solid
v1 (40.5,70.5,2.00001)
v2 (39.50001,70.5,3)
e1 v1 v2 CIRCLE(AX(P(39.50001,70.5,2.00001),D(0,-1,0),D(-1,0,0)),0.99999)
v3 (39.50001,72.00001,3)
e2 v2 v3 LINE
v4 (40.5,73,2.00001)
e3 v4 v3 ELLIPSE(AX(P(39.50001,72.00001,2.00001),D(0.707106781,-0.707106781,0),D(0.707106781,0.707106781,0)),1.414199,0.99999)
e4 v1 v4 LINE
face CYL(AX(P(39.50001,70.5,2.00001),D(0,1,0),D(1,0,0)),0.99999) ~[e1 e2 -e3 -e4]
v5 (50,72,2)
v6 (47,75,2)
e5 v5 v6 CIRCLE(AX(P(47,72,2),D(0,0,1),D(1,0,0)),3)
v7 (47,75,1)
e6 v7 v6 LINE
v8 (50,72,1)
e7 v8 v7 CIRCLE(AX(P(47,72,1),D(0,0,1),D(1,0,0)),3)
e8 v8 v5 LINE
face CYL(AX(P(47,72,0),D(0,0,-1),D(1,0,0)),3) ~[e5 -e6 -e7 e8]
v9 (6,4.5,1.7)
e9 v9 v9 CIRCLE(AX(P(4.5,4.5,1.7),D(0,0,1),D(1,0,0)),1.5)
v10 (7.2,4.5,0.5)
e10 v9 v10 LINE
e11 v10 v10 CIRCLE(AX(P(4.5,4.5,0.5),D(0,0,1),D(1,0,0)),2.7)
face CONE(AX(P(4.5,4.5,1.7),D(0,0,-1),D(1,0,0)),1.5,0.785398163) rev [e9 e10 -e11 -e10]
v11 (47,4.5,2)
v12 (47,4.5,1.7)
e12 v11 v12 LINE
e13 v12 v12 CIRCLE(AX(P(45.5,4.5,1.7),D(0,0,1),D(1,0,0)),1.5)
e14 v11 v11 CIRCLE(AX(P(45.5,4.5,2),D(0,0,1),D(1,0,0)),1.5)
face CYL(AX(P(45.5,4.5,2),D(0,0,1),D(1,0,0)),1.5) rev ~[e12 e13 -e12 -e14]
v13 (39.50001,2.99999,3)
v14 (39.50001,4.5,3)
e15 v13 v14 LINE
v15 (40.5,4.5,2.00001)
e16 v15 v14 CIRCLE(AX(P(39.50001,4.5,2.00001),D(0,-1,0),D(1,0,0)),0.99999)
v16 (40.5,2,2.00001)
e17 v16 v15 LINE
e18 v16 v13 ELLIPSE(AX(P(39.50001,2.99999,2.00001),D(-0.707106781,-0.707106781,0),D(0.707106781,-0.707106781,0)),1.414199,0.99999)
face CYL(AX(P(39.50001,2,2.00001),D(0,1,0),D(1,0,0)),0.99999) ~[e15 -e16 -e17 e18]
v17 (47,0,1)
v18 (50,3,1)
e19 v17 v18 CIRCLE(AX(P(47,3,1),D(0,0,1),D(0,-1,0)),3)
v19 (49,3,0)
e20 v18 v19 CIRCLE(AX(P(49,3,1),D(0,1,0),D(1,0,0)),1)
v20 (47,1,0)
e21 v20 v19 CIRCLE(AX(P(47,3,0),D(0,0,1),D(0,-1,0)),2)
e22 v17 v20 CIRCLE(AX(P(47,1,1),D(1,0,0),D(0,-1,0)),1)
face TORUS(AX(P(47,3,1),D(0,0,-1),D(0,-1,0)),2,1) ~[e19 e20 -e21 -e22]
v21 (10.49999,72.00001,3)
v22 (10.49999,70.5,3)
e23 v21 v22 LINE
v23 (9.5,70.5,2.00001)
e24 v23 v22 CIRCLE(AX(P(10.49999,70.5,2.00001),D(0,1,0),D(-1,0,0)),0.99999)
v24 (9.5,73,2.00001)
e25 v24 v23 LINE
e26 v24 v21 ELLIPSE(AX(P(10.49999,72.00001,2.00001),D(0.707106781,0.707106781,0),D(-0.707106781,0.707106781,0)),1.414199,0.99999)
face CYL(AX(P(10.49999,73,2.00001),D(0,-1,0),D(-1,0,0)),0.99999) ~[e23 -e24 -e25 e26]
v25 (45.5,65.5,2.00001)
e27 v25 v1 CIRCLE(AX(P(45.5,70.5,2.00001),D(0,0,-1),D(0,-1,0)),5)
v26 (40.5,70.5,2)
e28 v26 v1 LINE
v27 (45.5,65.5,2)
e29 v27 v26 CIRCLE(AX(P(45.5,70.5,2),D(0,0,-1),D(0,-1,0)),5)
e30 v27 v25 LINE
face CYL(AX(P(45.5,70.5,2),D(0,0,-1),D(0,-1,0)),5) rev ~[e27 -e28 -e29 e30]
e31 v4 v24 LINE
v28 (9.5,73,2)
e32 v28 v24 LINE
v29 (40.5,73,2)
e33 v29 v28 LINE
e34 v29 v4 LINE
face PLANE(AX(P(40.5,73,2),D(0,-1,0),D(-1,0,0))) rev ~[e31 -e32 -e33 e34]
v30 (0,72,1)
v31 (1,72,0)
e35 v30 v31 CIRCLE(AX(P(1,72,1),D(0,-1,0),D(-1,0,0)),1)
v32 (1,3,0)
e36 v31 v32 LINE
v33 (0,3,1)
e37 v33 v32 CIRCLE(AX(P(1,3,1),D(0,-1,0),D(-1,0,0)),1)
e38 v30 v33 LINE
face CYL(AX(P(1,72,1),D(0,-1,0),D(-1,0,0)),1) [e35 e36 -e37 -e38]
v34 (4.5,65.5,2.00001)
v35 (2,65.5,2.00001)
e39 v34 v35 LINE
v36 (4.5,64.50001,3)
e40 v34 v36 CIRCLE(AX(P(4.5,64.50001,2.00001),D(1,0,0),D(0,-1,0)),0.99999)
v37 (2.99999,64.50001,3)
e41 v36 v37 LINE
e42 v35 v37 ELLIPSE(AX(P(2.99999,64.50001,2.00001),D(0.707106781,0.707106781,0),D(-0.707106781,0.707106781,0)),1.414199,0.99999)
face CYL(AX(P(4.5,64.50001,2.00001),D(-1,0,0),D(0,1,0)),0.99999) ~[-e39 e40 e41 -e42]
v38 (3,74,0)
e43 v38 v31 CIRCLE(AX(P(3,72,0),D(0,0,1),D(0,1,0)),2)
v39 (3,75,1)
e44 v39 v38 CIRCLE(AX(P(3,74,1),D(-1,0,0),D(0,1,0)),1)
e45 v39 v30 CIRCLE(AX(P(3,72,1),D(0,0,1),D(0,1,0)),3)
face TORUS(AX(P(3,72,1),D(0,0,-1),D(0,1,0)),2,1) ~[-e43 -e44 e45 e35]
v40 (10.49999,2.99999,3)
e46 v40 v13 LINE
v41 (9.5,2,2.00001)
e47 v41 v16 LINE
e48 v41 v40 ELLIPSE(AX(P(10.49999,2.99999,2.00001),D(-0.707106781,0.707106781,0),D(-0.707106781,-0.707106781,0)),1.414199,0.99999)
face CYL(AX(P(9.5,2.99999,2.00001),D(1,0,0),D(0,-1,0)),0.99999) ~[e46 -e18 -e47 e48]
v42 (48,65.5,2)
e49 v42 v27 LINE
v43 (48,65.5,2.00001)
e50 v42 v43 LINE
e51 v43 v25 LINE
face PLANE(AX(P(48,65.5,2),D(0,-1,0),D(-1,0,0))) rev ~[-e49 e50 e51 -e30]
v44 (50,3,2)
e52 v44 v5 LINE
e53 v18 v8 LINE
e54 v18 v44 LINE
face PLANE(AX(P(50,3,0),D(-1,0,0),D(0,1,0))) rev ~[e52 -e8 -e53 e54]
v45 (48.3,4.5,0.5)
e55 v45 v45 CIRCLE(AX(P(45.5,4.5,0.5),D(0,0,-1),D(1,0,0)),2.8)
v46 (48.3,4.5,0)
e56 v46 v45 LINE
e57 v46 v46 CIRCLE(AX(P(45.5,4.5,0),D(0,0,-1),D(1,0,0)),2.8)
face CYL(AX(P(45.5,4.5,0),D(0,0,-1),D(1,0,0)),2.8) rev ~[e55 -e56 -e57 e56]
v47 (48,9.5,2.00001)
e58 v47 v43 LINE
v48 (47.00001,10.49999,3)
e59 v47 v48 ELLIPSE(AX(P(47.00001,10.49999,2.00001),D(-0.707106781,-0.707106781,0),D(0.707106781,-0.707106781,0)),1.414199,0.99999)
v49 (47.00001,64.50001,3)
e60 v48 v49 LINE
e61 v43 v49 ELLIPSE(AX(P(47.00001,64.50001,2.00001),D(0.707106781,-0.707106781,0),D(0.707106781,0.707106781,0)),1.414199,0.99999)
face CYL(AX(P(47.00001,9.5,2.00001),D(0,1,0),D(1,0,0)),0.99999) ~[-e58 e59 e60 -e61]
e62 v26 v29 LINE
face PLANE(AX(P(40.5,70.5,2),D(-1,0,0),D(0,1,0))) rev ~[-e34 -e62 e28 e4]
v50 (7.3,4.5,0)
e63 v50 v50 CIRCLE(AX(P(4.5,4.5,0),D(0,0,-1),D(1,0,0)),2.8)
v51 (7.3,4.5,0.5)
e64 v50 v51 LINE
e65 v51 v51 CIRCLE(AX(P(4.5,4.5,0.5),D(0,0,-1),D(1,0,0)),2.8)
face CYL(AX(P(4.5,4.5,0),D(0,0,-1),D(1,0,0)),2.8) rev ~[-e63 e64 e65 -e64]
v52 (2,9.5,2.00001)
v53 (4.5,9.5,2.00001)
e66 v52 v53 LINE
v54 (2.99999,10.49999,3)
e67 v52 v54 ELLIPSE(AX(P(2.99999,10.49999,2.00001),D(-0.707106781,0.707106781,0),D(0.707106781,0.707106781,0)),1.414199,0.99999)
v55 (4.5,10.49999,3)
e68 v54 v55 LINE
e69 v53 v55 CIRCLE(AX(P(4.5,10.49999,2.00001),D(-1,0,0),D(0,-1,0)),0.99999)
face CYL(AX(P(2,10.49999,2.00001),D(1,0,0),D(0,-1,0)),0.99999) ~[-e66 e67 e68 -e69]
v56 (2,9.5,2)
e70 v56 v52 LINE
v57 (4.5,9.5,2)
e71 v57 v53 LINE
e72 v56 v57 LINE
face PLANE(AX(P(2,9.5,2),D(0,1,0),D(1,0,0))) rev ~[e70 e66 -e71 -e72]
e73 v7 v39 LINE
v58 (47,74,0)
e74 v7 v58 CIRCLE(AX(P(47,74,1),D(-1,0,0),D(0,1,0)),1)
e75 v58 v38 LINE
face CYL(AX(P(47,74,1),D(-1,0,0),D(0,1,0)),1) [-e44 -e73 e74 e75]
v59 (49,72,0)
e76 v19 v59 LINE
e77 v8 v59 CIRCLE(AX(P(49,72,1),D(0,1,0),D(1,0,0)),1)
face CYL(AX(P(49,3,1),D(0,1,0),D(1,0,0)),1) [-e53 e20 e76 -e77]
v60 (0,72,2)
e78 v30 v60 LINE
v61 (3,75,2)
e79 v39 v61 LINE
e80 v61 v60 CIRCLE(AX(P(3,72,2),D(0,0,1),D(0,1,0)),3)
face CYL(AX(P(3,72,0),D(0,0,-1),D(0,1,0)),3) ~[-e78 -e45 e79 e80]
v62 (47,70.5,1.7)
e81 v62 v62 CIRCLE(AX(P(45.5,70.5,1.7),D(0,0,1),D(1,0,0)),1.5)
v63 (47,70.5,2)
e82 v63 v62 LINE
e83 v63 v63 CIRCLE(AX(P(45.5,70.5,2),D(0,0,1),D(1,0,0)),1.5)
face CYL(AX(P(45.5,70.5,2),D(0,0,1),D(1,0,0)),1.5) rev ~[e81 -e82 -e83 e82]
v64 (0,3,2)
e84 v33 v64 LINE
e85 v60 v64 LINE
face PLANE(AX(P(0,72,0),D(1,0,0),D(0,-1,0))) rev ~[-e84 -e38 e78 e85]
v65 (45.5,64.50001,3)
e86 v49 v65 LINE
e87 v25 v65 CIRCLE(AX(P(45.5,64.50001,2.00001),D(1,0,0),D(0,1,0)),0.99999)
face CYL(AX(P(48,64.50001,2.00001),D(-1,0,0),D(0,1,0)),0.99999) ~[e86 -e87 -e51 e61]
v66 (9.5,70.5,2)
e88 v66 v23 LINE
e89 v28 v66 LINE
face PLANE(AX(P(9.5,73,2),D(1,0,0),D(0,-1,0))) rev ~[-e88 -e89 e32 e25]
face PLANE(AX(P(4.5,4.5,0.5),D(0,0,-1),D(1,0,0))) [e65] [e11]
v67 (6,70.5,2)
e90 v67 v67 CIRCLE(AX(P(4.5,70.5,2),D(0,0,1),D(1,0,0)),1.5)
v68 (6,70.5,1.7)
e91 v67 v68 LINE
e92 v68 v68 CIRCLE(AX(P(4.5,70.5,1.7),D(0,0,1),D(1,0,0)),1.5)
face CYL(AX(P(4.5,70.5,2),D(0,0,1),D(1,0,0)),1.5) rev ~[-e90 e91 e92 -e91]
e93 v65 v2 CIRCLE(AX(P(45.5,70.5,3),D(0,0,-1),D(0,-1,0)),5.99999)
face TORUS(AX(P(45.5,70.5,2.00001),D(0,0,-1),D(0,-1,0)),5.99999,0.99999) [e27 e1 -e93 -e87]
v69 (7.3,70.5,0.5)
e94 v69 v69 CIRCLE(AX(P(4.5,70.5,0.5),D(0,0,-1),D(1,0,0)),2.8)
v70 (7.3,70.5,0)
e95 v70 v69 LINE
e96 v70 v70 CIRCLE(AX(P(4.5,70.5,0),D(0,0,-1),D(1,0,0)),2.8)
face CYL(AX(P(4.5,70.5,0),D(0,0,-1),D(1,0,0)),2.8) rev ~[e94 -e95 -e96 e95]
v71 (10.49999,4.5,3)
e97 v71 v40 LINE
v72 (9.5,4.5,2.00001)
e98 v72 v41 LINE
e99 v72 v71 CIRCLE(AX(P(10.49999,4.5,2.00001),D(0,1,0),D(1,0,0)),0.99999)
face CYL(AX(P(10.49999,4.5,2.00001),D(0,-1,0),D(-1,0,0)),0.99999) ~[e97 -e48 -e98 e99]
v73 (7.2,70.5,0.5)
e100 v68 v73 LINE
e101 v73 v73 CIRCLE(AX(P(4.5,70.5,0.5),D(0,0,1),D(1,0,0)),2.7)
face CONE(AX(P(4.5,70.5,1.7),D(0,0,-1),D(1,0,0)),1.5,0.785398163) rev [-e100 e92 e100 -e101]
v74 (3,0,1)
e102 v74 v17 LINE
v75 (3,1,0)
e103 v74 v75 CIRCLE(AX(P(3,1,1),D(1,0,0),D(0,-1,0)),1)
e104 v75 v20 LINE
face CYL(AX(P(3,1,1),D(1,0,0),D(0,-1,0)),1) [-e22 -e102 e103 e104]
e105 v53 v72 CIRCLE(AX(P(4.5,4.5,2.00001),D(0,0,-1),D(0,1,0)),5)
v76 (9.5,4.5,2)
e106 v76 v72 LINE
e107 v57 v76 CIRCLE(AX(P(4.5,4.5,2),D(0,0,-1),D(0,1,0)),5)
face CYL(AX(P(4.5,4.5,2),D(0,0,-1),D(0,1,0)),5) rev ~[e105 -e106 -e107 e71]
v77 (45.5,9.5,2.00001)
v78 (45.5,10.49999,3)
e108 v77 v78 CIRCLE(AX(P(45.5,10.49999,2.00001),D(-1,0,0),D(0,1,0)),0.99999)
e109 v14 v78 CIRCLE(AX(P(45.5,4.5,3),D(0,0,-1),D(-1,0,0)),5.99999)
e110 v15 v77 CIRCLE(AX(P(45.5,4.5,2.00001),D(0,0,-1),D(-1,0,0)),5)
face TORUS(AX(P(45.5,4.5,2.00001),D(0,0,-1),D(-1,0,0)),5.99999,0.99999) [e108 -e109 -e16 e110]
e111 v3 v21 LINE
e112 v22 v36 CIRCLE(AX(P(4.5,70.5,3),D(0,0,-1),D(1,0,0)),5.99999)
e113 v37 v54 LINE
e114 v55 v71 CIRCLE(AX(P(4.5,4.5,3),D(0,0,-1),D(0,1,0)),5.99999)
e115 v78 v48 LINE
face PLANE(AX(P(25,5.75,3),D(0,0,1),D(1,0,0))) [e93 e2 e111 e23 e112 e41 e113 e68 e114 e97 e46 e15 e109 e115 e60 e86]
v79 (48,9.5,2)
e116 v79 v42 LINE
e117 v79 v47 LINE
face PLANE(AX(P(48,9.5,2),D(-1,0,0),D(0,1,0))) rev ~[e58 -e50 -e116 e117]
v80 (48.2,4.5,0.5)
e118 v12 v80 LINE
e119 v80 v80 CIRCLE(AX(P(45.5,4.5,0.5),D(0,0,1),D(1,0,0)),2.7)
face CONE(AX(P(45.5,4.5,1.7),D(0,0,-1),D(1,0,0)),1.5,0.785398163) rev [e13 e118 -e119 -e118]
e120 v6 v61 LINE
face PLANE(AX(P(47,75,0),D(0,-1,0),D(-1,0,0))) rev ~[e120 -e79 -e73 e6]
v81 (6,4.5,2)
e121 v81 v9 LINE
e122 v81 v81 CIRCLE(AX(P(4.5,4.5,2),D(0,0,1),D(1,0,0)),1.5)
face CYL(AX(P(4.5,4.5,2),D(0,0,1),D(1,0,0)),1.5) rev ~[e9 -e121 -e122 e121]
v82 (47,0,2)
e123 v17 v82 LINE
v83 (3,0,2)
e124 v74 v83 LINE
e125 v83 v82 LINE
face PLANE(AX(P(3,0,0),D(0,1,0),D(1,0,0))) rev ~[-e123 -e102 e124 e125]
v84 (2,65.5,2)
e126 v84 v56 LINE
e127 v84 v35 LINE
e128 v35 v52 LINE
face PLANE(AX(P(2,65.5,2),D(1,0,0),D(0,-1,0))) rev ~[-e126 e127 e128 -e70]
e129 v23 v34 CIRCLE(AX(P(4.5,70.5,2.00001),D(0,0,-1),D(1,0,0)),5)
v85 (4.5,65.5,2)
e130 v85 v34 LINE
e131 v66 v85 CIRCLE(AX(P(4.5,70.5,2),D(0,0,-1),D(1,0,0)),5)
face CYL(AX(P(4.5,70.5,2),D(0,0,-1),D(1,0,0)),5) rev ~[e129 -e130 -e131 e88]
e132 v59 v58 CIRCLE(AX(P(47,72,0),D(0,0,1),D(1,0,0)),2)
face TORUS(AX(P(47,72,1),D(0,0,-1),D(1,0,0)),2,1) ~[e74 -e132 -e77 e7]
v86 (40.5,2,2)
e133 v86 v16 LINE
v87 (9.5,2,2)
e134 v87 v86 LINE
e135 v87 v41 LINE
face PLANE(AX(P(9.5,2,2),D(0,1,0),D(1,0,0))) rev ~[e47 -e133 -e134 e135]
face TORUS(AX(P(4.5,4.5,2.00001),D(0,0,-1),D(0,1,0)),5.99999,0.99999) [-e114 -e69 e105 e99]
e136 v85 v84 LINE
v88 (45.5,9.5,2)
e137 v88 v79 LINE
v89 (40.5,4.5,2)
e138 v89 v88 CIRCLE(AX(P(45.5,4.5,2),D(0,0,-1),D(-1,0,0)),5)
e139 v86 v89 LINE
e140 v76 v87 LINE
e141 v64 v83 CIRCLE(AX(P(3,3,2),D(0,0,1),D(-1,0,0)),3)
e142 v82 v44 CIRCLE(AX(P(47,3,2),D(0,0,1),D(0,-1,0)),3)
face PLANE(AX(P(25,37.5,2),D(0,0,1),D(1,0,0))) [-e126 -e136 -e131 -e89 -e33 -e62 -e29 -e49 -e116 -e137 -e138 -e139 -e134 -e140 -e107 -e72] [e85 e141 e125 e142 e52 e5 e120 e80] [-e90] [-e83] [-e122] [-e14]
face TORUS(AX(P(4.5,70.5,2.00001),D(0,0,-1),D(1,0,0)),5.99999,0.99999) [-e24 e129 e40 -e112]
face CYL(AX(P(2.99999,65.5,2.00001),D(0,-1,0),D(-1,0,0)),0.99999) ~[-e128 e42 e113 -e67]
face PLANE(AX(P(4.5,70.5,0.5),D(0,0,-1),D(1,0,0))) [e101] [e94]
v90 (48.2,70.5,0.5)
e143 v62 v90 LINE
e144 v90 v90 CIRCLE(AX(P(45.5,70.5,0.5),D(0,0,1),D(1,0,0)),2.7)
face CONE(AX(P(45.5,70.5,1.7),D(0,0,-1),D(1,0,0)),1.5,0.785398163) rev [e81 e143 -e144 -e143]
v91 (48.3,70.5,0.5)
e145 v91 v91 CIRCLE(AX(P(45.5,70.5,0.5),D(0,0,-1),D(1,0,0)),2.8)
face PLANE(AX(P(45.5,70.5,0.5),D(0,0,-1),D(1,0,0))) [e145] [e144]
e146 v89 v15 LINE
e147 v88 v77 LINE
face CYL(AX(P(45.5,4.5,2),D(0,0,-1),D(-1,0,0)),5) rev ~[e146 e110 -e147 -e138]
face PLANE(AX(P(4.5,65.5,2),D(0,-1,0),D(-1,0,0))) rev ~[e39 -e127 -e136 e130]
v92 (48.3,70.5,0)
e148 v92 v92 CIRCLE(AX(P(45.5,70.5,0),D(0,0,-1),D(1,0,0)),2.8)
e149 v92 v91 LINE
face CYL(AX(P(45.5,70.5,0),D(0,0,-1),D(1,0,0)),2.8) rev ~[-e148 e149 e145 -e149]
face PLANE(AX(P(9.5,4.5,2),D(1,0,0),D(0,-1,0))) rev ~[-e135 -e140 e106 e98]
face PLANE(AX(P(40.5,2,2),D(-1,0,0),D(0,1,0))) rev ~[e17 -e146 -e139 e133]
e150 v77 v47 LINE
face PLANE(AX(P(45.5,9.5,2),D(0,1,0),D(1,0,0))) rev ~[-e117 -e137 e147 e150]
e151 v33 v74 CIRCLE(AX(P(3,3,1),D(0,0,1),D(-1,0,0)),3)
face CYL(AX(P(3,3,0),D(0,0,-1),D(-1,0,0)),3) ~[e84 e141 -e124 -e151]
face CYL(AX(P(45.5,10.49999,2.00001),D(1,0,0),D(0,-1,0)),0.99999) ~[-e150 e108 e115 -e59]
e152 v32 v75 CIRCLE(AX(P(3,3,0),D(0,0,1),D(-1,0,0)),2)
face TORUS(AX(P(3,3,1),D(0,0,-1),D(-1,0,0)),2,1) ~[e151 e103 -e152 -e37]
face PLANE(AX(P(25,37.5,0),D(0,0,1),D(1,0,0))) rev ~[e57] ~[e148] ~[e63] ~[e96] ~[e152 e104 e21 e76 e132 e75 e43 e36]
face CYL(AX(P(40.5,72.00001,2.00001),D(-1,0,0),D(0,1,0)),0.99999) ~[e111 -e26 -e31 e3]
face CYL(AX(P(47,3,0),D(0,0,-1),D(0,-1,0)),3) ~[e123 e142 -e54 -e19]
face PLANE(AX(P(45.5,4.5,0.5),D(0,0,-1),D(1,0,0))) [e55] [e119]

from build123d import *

# Parameters (mm, degrees)
F1_DEPTH  = 2
F2_R      = 1.5
F3_DEPTH  = 5
F4_W      = 31
F4_H      = 56
F5_DEPTH  = 1
F6_R      = 0.99999
F7_R      = 1
F8_R      = 2.8
F9_DEPTH  = 0.5
F10_SIZE2 = 1.2
F10_SIZE  = 1.2


# Not quite as in the source:
# - a fillet or chamfer is up to 0.001 mm smaller than in the source, because OpenCascade refuses the exact size
# - a feature names something its author has since deleted; it is built from what else it names


with BuildPart() as f1:
    # F0 (on Top) → F1 (new body)
    with BuildSketch(Plane.XY):
        with BuildLine():
            ThreePointArc((0, 3), (0.8786796564, 0.8786796564), (3, 0))
            Line((3, 0), (47, 0))
            ThreePointArc((47, 0), (49.1213203436, 0.8786796564), (50, 3))
            Line((50, 3), (50, 72))
            ThreePointArc((50, 72), (49.1213203436, 74.1213203436), (47, 75))
            Line((47, 75), (3, 75))
            ThreePointArc((3, 75), (0.8786796564, 74.1213203436), (0, 72))
            Line((0, 72), (0, 3))
        make_face()
    extrude(amount=F1_DEPTH)

    # F2 (on face) → F3 (cut)
    with BuildSketch(Plane.XY.offset(2)):
        with Locations((4.5, 70.5)):
            Circle(F2_R)
        with Locations((45.5, 70.5)):
            Circle(F2_R)
        with Locations((4.5, 4.5)):
            Circle(F2_R)
        with Locations((45.5, 4.5)):
            Circle(F2_R)
    extrude(amount=-F3_DEPTH, mode=Mode.SUBTRACT)

    # F4 (on face) → F5 (join)
    with BuildSketch(Plane.XY.offset(2)):
        Polygon((9.5, 9.5), (9.5, 4.5), (9.5, 2), (40.5, 2), (40.5, 4.5), (40.5, 9.5), align=None)
        Polygon((9.5, 70.5), (9.5, 65.5), (40.5, 65.5), (40.5, 70.5), (40.5, 73), (9.5, 73), align=None)
        Polygon((2, 9.5), (4.5, 9.5), (9.5, 9.5), (9.5, 65.5), (4.5, 65.5), (2, 65.5), align=None)
        with Locations((25, 37.5)):
            Rectangle(F4_W, F4_H)
        Polygon((40.5, 65.5), (40.5, 9.5), (45.5, 9.5), (48, 9.5), (48, 65.5), (45.5, 65.5), align=None)
        with BuildLine():
            Line((4.5, 65.5), (9.5, 65.5))
            Line((9.5, 65.5), (9.5, 70.5))
            ThreePointArc((9.5, 70.5), (8.0355339059, 66.9644660941), (4.5, 65.5))
        make_face()
        with BuildLine():
            Line((40.5, 70.5), (40.5, 65.5))
            Line((40.5, 65.5), (45.5, 65.5))
            ThreePointArc((45.5, 65.5), (41.9644660941, 66.9644660941), (40.5, 70.5))
        make_face()
        with BuildLine():
            Line((45.5, 9.5), (40.5, 9.5))
            Line((40.5, 9.5), (40.5, 4.5))
            ThreePointArc((40.5, 4.5), (41.9644660941, 8.0355339059), (45.5, 9.5))
        make_face()
        with BuildLine():
            ThreePointArc((4.5, 9.5), (8.0355339059, 8.0355339059), (9.5, 4.5))
            Line((9.5, 4.5), (9.5, 9.5))
            Line((9.5, 9.5), (4.5, 9.5))
        make_face()
    extrude(amount=F5_DEPTH)

    # F6 (radius 1 in the source; OpenCascade refuses exactly that, so slightly less here)
    f6_edges = [f1.edges().sort_by_distance(p)[0] for p in [
        (9.5, 3.25, 3),
        (25, 2, 3),
        (40.5, 3.25, 3),
        (41.964466, 8.035534, 3),
        (46.75, 9.5, 3),
        (48, 37.5, 3),
        (46.75, 65.5, 3),
        (41.964466, 66.964466, 3),
        (40.5, 71.75, 3),
        (25, 73, 3),
        (9.5, 71.75, 3),
        (8.035534, 66.964466, 3),
        (3.25, 65.5, 3),
        (2, 37.5, 3),
        (3.25, 9.5, 3),
        (8.035534, 8.035534, 3),
    ]]
    fillet(f6_edges, radius=F6_R)

    # F7
    f7_edges = [f1.edges().sort_by_distance(p)[0] for p in [
        (0, 37.5, 0),
    ]]
    fillet(f7_edges, radius=F7_R)

    # F8 (on face) → F9 (cut)
    with BuildSketch(Plane(origin=(0, 0, 0), x_dir=(1, 0, 0), z_dir=(0, 0, -1))):
        with Locations((4.5, -4.5)):
            Circle(F8_R)
        with Locations((45.5, -4.5)):
            Circle(F8_R)
        with Locations((45.5, -70.5)):
            Circle(F8_R)
        with Locations((4.5, -70.5)):
            Circle(F8_R)
    extrude(amount=-F9_DEPTH, mode=Mode.SUBTRACT)

    # F10
    f10_edges = [f1.edges().sort_by_distance(p)[0] for p in [
        (3, 4.5, 0.5),
        (44, 4.5, 0.5),
        (3, 70.5, 0.5),
        (44, 70.5, 0.5),
    ]]
    chamfer(f10_edges, length=F10_SIZE, length2=F10_SIZE2)


solid = f1.part
